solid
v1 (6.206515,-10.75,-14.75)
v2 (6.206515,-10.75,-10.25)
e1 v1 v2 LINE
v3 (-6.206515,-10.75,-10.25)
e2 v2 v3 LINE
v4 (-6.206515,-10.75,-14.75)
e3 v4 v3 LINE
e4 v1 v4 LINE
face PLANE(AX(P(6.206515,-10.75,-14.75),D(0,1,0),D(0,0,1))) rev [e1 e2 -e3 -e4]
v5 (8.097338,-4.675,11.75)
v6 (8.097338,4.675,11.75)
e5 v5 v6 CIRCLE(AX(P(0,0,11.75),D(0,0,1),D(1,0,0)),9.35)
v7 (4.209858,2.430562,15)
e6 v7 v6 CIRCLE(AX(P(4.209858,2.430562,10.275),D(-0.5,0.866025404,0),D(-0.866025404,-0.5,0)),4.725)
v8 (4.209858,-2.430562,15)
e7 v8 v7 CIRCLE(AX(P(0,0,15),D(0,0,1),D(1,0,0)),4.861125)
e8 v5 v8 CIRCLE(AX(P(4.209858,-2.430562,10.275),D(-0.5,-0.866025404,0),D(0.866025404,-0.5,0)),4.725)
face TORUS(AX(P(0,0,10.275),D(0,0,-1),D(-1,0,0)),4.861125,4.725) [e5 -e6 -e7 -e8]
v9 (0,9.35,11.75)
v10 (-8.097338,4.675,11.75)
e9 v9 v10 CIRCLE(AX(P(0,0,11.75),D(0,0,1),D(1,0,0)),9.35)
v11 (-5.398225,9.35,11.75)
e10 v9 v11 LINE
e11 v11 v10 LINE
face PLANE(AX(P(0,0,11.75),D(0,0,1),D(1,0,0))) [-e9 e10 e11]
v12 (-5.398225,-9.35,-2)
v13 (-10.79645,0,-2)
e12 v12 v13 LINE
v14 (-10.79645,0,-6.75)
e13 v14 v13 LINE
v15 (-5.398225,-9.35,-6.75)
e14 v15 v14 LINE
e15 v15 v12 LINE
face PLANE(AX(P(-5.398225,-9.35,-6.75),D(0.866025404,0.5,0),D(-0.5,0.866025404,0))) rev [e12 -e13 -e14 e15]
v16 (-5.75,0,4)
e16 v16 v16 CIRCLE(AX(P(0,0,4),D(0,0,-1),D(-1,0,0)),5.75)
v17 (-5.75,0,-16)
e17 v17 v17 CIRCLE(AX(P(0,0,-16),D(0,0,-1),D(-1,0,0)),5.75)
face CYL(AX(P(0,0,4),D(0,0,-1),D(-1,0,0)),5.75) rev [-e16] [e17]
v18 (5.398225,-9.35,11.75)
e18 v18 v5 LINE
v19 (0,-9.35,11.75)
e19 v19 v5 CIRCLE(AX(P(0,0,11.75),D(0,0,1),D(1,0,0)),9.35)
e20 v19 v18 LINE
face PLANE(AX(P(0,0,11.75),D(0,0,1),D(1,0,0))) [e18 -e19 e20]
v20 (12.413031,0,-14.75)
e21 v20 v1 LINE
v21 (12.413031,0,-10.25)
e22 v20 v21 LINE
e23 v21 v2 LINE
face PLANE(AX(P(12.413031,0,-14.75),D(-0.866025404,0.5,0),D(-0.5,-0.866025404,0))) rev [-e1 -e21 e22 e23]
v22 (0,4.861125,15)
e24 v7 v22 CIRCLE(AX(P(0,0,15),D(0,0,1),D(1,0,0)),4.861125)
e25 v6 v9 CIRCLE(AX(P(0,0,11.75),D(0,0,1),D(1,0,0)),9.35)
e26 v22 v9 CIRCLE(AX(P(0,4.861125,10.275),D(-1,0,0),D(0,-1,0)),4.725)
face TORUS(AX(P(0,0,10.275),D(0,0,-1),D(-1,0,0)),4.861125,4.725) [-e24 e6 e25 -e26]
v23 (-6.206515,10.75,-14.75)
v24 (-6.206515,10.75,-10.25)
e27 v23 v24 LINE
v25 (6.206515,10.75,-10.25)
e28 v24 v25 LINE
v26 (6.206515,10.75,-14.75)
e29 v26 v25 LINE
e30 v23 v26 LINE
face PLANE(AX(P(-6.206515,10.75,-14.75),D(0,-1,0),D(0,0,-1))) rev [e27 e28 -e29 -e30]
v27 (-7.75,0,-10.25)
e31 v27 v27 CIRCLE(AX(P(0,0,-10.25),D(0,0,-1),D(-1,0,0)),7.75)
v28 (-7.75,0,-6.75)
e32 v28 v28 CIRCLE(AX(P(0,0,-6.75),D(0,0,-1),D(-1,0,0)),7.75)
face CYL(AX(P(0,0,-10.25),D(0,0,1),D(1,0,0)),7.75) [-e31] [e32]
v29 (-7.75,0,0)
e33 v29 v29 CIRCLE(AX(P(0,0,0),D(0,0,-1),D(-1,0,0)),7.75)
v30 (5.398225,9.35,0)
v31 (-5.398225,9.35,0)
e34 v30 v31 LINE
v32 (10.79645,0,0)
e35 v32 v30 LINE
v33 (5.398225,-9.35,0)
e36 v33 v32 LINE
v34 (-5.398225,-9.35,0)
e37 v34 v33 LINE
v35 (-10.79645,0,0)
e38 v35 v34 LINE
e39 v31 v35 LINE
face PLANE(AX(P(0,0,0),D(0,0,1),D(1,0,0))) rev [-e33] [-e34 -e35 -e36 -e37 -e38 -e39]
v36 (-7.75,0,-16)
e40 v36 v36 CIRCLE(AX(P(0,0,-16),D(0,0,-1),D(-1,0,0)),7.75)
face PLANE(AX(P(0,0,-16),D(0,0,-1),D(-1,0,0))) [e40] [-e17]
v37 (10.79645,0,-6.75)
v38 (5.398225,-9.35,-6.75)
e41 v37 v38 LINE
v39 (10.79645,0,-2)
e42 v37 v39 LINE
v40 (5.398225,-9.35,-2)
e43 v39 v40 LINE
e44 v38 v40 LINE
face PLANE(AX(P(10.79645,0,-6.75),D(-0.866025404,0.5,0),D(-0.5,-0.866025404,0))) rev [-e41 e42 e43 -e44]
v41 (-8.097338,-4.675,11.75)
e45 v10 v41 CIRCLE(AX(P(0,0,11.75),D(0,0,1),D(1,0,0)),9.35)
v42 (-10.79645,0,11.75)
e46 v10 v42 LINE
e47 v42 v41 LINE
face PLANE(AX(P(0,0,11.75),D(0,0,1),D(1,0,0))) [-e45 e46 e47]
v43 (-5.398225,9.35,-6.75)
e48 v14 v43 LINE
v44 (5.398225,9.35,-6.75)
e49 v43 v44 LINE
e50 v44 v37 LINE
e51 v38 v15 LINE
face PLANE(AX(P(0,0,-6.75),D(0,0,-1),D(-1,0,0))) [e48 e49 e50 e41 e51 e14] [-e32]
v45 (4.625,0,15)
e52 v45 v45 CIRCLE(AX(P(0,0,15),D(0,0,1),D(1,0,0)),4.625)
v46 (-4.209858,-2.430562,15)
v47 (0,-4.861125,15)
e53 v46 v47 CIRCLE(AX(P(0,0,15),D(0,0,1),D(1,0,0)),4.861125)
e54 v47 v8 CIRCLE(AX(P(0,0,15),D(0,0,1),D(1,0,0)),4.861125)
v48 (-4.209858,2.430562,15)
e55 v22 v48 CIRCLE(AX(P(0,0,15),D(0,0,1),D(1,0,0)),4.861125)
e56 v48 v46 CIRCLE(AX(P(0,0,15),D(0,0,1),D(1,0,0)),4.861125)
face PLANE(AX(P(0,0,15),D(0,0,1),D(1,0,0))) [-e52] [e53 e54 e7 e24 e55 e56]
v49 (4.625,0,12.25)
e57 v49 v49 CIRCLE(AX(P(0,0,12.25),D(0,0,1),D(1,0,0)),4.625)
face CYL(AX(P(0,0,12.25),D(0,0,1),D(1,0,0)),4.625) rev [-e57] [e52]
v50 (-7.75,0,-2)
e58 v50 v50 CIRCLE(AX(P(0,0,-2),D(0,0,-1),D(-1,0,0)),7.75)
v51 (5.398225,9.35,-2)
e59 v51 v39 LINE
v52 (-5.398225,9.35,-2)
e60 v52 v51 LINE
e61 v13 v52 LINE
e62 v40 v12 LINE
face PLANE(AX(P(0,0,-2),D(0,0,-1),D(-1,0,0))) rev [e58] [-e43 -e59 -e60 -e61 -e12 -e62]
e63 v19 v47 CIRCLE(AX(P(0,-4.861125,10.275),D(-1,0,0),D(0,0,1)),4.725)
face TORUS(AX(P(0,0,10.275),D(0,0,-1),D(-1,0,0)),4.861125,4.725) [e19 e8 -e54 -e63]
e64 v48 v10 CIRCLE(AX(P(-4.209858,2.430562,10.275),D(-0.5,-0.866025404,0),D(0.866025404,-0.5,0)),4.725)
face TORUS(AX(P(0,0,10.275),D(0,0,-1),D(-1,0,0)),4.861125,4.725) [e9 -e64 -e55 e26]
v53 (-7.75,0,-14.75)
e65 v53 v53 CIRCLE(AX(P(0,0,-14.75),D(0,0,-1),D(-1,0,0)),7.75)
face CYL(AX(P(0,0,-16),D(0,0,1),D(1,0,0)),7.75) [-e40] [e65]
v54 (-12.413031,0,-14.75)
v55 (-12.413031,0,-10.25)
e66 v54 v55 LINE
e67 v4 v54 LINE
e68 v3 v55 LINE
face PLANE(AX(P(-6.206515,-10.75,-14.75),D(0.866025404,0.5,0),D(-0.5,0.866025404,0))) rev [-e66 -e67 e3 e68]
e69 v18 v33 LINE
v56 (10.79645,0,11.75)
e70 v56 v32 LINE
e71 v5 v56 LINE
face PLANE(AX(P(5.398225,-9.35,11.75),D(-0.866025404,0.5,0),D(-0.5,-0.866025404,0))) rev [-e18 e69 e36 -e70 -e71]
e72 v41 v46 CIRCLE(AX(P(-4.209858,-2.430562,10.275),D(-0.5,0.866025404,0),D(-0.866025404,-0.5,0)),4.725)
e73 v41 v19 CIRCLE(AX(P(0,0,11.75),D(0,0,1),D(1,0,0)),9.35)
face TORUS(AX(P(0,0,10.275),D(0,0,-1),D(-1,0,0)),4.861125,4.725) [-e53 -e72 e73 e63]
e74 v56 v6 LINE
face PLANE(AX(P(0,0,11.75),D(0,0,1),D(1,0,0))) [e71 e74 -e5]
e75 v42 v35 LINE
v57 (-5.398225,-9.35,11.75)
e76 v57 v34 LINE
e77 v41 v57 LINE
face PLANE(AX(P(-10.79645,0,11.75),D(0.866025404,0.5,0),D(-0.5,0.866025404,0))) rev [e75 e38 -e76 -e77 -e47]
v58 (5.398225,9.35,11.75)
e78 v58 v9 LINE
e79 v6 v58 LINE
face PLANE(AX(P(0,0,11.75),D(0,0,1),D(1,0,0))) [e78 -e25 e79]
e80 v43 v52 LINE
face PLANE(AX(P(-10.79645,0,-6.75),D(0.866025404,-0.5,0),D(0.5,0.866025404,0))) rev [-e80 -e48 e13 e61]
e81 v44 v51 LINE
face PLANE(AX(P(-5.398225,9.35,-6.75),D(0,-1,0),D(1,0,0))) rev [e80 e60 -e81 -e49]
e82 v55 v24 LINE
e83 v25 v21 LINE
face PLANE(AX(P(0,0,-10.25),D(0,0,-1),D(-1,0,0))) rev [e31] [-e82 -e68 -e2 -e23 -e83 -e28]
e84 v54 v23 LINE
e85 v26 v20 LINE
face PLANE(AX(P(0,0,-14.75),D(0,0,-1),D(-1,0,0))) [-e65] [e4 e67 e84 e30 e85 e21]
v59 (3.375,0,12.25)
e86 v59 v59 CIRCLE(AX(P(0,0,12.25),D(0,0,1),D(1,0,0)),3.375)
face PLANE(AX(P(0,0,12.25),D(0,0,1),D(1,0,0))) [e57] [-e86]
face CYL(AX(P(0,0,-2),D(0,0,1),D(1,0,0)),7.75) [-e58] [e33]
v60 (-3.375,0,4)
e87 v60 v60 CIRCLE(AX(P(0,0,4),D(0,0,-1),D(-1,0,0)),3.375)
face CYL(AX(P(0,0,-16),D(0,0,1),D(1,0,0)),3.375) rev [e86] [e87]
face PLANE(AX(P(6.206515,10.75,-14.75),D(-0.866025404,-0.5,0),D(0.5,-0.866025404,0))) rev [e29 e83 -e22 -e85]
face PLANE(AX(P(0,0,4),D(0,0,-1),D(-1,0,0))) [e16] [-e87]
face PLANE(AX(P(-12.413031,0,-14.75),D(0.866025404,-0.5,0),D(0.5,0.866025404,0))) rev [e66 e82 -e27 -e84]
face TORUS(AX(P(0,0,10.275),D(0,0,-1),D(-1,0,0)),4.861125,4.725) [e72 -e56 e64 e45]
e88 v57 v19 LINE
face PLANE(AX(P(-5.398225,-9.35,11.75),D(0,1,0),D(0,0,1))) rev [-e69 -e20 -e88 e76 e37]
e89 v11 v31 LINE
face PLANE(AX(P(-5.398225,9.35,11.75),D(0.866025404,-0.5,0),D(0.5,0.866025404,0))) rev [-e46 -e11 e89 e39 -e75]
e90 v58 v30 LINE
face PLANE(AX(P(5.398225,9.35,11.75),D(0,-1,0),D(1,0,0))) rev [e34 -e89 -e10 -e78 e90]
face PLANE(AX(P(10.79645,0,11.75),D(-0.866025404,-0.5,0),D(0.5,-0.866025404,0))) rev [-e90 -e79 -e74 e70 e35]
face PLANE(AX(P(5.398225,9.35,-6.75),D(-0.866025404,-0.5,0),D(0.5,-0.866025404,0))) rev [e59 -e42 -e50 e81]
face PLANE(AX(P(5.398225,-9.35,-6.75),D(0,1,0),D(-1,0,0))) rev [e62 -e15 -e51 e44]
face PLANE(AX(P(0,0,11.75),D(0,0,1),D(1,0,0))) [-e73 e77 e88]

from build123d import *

# Parameters (mm, degrees)
BOSS_EXTRUDE1_DEPTH = 11.75
SKETCH2_R           = 7.75
BOSS_EXTRUDE2_DEPTH = 2
BOSS_EXTRUDE3_DEPTH = 4.75
SKETCH4_R           = 7.75
BOSS_EXTRUDE4_DEPTH = 3.5
BOSS_EXTRUDE5_DEPTH = 4.5
SKETCH6_R           = 7.75
BOSS_EXTRUDE6_DEPTH = 1.25
SKETCH7_R           = 5.75
CUT_EXTRUDE1_DEPTH  = 20
SKETCH8_R           = 9.35
BOSS_EXTRUDE7_DEPTH = 3.25
SKETCH9_R           = 4.625
CUT_EXTRUDE2_DEPTH  = 2.75
FILLET2_R           = 4.725
SKETCH10_R          = 3.375
CUT_EXTRUDE3_DEPTH  = 33.675806544


with BuildPart() as part:
    # Sketch1 → Boss-Extrude1 (new body)
    with BuildSketch(Plane.XY):
        Polygon((10.796450034, 0), (5.398225017, 9.35), (-5.398225017, 9.35), (-10.796450034, 0), (-5.398225017, -9.35), (5.398225017, -9.35), align=None)
    extrude(amount=BOSS_EXTRUDE1_DEPTH)

    # Sketch2 → Boss-Extrude2 (add)
    with BuildSketch(Plane(origin=(0, 0, 0), x_dir=(-1, 0, 0), z_dir=(0, 0, -1))):
        Circle(SKETCH2_R)
    extrude(amount=BOSS_EXTRUDE2_DEPTH)

    # Sketch3 → Boss-Extrude3 (add)
    with BuildSketch(Plane(origin=(0, 0, -2), x_dir=(-1, 0, 0), z_dir=(0, 0, -1))):
        Polygon((10.796450034, 0), (5.398225017, 9.35), (-5.398225017, 9.35), (-10.796450034, 0), (-5.398225017, -9.35), (5.398225017, -9.35), align=None)
    extrude(amount=BOSS_EXTRUDE3_DEPTH)

    # Sketch4 → Boss-Extrude4 (add)
    with BuildSketch(Plane(origin=(0, 0, -6.75), x_dir=(-1, 0, 0), z_dir=(0, 0, -1))):
        Circle(SKETCH4_R)
    extrude(amount=BOSS_EXTRUDE4_DEPTH)

    # Sketch5 → Boss-Extrude5 (add)
    with BuildSketch(Plane(origin=(0, 0, -10.25), x_dir=(-1, 0, 0), z_dir=(0, 0, -1))):
        Polygon((12.413030788, 0), (6.206515394, 10.75), (-6.206515394, 10.75), (-12.413030788, 0), (-6.206515394, -10.75), (6.206515394, -10.75), align=None)
    extrude(amount=BOSS_EXTRUDE5_DEPTH)

    # Sketch6 → Boss-Extrude6 (add)
    with BuildSketch(Plane(origin=(0, 0, -14.75), x_dir=(-1, 0, 0), z_dir=(0, 0, -1))):
        Circle(SKETCH6_R)
    extrude(amount=BOSS_EXTRUDE6_DEPTH)

    # Sketch7 → Cut-Extrude1 (cut)
    with BuildSketch(Plane(origin=(0, 0, -16), x_dir=(-1, 0, 0), z_dir=(0, 0, -1))):
        Circle(SKETCH7_R)
    extrude(amount=-CUT_EXTRUDE1_DEPTH, mode=Mode.SUBTRACT)

    # Sketch8 → Boss-Extrude7 (add)
    with BuildSketch(Plane.XY.offset(11.75)):
        with Locations(Location((0, 0, 0), (0, 0, 210))):
            Circle(SKETCH8_R)
    extrude(amount=BOSS_EXTRUDE7_DEPTH)

    # Sketch9 → Cut-Extrude2 (cut)
    with BuildSketch(Plane.XY.offset(15)):
        Circle(SKETCH9_R)
    extrude(amount=-CUT_EXTRUDE2_DEPTH, mode=Mode.SUBTRACT)

    # Fillet2
    # the kernel refuses this fillet: 4.725 mm, written as the material it takes off along each edge
    with BuildSketch(Plane(origin=(0, 0, 15), x_dir=(-0.8660254037844385, -0.5000000000000001, 0), z_dir=(-0.5000000000000001, 0.8660254037844385, 0))) as fillet2_piece_1:
        with BuildLine():
            CenterArc((4.861124863, -4.725), FILLET2_R, 18.190012051, 71.809987949)
            Line((4.861124863, 0), (4.861124863, 0.0945))
            Line((4.861124863, 0.0945), (9.35, 0.0945))
            Line((9.35, 0.0945), (9.4445, 0))
            ThreePointArc((9.4445, 0), (9.4445, -1.625), (9.439777503, -3.2205))
            Line((9.439777503, -3.2205), (9.35, -3.25))
        make_face()
    revolve(axis=Axis((0, 0, 15), (0, 0, 1)), mode=Mode.SUBTRACT)

    # Sketch10 → Cut-Extrude3 (cut, through all)
    with BuildSketch(Plane.XY.offset(12.25)):
        Circle(SKETCH10_R)
    extrude(amount=-CUT_EXTRUDE3_DEPTH, mode=Mode.SUBTRACT)


solid = part.part
